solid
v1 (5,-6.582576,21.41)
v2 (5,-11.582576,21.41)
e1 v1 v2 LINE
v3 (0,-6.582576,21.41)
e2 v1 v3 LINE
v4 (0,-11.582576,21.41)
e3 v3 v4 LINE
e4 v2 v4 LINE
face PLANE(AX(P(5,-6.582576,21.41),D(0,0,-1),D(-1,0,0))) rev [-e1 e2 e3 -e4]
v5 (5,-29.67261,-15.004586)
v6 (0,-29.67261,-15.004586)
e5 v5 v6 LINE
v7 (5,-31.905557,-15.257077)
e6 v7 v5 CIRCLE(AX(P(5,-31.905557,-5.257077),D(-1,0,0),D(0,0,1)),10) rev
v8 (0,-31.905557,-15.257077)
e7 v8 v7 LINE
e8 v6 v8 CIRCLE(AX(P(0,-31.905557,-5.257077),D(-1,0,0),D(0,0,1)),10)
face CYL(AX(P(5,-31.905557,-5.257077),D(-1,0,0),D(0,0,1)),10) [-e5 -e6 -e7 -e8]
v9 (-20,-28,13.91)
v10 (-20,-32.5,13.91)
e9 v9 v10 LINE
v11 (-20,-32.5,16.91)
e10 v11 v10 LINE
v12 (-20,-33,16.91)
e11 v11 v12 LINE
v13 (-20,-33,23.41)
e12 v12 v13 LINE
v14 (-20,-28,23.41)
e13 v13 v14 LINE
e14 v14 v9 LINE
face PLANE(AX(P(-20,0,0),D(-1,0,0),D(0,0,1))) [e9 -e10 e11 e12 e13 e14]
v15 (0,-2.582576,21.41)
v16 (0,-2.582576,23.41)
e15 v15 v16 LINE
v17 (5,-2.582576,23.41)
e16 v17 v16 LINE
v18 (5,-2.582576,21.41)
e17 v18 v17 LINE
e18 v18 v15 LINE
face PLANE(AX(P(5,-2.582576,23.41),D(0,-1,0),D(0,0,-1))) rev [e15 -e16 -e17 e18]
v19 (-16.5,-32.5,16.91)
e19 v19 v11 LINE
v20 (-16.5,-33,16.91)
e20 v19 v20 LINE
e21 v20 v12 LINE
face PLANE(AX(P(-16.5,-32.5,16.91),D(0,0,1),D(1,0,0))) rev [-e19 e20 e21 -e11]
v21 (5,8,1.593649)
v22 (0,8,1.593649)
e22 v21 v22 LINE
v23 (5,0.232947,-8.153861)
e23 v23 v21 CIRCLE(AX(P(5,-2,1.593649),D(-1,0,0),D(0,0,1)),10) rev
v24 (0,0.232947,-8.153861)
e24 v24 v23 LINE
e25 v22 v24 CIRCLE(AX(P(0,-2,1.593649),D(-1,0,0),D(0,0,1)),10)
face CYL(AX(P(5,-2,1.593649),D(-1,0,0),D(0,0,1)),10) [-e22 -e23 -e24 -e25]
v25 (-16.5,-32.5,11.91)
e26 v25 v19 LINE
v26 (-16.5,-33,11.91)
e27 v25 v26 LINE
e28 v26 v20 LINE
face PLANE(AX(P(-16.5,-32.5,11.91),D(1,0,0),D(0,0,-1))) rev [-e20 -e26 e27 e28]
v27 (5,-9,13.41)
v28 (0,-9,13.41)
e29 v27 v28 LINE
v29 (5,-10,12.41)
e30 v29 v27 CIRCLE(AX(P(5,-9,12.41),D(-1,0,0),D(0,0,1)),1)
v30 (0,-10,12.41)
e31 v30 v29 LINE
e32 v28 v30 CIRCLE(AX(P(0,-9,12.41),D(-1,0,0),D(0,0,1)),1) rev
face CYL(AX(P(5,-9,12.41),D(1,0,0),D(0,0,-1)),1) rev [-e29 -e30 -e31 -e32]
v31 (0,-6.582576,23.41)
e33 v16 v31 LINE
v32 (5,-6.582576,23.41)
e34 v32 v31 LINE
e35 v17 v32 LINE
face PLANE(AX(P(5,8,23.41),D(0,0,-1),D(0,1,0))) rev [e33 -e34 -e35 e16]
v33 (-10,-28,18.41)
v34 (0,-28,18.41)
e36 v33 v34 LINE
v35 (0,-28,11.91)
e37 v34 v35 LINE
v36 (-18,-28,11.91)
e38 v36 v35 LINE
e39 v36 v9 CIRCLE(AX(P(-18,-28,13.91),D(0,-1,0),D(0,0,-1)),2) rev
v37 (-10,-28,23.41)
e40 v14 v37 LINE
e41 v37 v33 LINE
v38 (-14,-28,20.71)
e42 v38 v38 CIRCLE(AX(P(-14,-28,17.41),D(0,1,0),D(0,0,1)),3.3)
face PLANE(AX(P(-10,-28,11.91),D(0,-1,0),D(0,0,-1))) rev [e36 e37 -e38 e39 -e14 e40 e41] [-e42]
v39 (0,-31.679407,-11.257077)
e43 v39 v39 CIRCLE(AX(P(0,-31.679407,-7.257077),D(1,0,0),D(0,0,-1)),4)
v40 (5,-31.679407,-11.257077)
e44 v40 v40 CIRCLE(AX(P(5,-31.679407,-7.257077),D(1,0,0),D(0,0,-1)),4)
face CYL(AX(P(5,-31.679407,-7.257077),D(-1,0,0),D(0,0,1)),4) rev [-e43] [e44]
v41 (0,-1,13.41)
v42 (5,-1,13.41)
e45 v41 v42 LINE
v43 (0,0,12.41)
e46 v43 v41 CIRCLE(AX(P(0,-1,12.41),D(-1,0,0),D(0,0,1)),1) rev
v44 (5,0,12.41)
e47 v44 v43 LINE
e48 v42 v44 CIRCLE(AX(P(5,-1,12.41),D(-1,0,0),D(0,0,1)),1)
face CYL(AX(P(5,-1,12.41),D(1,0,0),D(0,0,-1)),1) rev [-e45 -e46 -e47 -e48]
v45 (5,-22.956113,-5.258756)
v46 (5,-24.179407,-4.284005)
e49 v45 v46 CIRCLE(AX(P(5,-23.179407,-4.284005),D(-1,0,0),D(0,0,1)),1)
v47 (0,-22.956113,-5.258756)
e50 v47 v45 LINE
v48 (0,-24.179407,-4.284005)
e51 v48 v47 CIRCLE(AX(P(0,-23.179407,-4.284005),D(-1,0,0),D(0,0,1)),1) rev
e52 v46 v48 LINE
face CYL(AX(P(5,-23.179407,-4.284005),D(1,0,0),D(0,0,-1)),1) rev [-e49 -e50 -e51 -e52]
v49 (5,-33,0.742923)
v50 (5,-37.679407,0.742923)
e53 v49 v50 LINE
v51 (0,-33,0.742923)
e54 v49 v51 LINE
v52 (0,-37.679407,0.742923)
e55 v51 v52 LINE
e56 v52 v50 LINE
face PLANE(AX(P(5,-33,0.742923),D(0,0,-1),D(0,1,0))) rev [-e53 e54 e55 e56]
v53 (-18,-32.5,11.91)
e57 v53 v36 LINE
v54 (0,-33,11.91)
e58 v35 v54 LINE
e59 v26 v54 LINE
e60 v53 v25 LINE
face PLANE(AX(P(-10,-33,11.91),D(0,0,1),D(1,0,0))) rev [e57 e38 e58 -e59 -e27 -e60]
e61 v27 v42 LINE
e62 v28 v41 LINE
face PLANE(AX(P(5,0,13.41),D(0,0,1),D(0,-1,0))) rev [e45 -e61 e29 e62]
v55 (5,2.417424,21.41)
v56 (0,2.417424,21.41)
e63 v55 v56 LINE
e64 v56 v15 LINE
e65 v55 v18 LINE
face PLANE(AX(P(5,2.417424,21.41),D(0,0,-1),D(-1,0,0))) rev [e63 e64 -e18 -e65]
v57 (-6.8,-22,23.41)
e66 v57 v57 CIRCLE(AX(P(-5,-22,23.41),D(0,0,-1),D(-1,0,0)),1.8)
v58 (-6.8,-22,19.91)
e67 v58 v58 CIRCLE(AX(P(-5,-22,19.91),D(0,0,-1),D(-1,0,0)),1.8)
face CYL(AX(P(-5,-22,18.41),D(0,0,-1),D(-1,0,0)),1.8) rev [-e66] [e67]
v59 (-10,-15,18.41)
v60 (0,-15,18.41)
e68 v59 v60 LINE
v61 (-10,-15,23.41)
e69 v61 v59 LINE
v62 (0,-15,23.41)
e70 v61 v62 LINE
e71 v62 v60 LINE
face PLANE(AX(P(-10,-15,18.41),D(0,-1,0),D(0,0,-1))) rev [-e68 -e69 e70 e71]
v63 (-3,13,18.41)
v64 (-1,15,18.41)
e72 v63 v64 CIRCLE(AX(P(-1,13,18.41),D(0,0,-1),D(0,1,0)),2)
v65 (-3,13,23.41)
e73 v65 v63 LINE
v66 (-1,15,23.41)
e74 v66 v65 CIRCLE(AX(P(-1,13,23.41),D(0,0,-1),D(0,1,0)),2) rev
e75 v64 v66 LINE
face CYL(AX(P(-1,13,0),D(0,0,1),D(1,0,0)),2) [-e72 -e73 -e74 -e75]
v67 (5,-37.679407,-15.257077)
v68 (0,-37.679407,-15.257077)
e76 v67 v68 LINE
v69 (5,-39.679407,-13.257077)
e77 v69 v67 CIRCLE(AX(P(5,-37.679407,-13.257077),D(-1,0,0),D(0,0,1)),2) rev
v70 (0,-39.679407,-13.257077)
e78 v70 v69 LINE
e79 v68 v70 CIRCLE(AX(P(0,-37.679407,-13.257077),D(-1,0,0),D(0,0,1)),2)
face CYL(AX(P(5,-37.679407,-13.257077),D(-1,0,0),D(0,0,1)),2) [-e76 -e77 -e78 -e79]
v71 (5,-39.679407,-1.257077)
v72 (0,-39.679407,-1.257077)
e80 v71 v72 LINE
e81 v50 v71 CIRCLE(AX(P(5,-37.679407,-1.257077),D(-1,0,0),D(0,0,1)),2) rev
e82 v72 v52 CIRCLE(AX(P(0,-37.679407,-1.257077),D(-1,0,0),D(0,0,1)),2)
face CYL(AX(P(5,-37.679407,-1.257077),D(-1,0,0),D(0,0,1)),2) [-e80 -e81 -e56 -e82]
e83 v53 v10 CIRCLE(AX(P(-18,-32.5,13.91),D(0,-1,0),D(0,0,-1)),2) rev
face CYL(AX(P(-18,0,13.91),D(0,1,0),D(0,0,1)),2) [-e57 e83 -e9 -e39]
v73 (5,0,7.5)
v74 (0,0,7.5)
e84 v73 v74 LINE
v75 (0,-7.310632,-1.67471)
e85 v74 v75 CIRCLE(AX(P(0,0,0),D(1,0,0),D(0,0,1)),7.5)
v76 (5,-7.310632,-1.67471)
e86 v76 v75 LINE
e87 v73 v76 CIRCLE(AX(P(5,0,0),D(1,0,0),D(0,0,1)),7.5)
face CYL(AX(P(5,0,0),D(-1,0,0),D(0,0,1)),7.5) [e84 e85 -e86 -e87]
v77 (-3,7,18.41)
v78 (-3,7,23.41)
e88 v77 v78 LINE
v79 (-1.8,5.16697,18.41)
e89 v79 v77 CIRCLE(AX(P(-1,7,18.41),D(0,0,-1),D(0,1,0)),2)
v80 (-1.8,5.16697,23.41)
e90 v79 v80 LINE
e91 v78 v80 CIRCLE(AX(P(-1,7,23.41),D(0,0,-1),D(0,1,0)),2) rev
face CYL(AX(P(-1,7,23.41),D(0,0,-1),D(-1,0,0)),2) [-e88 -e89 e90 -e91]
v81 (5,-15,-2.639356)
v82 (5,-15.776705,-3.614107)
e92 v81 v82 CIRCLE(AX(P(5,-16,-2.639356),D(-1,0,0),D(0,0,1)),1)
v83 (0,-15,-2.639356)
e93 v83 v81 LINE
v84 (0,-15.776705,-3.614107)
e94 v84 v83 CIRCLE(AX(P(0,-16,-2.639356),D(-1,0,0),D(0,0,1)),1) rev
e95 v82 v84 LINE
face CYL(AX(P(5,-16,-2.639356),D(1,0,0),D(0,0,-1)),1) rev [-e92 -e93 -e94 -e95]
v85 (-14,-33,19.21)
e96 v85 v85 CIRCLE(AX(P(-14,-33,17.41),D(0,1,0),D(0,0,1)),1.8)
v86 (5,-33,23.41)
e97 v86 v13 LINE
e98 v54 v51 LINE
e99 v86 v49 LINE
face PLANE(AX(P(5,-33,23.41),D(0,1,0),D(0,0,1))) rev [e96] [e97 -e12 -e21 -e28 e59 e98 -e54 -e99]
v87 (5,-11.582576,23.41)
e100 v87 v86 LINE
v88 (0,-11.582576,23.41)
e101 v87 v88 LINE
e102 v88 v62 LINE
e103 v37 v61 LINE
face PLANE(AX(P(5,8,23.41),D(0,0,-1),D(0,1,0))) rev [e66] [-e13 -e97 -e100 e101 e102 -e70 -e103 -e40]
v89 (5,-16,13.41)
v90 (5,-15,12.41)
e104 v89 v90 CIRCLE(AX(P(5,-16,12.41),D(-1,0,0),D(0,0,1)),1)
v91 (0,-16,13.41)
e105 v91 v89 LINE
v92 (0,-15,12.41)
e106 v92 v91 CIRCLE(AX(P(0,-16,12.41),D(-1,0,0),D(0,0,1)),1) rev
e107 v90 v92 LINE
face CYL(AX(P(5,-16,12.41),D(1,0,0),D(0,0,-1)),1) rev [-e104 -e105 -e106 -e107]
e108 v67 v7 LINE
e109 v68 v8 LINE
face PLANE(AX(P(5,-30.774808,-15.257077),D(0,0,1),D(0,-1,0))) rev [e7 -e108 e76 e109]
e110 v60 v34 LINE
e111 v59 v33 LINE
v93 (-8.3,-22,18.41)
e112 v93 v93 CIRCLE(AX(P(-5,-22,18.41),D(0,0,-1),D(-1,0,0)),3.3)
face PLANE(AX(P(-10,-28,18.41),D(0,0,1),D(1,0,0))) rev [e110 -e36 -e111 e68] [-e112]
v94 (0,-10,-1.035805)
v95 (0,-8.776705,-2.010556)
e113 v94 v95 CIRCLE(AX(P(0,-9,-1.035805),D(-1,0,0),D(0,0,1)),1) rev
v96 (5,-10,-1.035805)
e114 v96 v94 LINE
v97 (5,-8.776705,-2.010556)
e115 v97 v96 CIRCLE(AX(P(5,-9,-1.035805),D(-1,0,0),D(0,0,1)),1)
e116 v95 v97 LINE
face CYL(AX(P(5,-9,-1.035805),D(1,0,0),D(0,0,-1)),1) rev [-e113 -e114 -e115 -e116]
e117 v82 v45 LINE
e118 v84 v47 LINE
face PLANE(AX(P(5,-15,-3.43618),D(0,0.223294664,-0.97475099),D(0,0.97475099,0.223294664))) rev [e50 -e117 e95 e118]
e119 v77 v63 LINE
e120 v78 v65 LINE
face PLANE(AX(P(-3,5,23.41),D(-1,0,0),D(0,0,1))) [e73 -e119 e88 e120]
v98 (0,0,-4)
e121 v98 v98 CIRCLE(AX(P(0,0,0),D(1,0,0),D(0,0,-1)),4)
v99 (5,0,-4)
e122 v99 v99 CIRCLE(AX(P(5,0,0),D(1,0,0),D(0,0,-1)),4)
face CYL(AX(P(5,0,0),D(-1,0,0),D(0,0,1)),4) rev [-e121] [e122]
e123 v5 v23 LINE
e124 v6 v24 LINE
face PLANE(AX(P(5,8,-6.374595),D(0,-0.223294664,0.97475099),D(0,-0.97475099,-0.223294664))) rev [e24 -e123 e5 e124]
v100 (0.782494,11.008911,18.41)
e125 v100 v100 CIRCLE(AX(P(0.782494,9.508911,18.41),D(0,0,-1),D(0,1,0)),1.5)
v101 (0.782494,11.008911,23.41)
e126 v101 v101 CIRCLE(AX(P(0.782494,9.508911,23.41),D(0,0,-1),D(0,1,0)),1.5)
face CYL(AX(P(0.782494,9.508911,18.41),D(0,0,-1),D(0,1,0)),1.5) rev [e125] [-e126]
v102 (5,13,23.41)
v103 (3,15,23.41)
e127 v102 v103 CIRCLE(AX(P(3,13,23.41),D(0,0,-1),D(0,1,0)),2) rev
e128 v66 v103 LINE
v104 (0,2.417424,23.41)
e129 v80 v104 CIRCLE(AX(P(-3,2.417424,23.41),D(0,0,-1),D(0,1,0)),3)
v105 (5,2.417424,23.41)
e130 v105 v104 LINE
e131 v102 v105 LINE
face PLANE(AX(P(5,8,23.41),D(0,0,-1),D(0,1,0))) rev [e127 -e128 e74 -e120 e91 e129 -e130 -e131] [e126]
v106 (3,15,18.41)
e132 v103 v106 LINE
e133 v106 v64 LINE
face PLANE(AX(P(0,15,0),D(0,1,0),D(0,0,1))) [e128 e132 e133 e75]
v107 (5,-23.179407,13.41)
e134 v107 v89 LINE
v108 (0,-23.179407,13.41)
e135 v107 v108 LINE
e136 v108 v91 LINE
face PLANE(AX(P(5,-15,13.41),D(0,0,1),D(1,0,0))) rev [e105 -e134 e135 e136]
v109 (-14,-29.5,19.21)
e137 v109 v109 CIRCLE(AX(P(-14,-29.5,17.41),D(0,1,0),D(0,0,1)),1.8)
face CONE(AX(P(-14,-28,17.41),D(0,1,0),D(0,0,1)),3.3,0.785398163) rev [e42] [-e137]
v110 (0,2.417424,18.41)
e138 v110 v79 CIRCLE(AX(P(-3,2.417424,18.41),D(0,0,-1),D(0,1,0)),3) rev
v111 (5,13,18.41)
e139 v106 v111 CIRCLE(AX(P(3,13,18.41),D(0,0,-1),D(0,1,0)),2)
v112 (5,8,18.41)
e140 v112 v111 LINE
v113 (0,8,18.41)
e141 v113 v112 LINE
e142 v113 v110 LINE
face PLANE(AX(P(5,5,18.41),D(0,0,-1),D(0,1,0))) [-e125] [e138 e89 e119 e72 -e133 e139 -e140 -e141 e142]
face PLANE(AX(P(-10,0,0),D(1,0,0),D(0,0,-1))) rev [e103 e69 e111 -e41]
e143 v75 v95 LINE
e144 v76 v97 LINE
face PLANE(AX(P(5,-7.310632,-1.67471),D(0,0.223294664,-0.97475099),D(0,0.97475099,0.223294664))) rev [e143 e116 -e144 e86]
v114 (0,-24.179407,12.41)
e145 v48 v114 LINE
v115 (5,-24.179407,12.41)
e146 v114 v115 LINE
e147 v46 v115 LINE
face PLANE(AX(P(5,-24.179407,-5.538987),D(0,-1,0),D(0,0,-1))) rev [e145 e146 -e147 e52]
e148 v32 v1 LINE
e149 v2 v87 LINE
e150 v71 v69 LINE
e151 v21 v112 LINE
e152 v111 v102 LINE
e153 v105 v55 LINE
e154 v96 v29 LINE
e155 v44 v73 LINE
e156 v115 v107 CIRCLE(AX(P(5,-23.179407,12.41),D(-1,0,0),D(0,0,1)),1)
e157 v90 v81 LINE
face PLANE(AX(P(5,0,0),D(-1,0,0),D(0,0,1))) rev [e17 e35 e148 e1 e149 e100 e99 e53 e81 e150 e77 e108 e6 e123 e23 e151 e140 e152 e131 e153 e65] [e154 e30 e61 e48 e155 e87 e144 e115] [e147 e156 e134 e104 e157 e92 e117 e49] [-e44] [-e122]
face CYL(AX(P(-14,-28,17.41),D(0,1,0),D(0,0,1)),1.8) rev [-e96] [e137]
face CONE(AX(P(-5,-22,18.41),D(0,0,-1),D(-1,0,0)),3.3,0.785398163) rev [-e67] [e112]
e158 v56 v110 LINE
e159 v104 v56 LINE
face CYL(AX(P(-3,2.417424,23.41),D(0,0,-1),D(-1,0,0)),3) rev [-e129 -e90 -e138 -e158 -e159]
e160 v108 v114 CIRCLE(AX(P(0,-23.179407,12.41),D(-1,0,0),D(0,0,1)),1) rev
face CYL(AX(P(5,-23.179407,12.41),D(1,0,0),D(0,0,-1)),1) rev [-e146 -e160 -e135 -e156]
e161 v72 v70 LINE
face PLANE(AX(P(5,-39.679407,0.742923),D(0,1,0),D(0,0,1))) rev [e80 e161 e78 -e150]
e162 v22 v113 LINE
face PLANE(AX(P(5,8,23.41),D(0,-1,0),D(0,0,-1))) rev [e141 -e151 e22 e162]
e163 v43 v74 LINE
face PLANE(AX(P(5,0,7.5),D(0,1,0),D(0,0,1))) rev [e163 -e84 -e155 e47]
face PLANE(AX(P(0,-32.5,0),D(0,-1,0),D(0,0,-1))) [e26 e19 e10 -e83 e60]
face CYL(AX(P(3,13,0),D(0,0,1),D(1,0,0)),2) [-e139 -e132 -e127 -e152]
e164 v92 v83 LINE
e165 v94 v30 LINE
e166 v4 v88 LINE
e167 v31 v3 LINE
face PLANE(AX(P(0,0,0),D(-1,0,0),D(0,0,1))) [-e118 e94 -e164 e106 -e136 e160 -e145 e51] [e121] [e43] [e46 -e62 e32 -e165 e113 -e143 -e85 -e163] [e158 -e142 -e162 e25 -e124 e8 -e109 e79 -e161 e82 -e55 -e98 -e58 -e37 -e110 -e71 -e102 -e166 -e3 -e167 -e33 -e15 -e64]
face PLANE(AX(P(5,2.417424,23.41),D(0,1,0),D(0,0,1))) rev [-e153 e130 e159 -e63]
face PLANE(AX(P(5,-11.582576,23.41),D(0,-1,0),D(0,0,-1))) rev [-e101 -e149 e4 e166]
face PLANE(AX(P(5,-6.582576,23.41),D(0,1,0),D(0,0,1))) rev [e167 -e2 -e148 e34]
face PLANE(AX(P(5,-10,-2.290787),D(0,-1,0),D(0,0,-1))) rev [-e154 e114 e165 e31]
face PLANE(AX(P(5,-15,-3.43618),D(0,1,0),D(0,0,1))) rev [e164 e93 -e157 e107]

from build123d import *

# Parameters (mm, degrees)
SKETCH_1_R                = 4
EXTRUDE_1_DEPTH           = 5
EXTRUDE_2_DEPTH           = 10
FILLET_1_R                = 10
EXTRUDE_3_DEPTH           = 7
EXTRUDE_3_DEPTH_BACK      = 3
SKETCH_7_W                = 8
SKETCH_7_H                = 5
HOLE_WIZARD_1_D           = 3.6
HOLE_WIZARD_1_CSINK_D     = 6.6
HOLE_WIZARD_1_CSINK_ANGLE = 90
FILLET_2_R                = 2
FILLET_3_R                = 3
MM_TRANSITIONAL_1_D       = 3
SKETCH_10_W               = 2
SKETCH_10_H               = 5
CUT_EXTRUDE_1_DEPTH       = 48.143222787
SKETCH_11_W               = 11.5
SKETCH_11_H               = 5
EXTRUDE_4_DEPTH           = 10
HOLE_WIZARD_2_D           = 3.6
HOLE_WIZARD_2_CSINK_D     = 6.6
HOLE_WIZARD_2_CSINK_ANGLE = 90
CUT_EXTRUDE_2_DEPTH       = 51.224331302
FILLET_5_R                = 1
FILLET_6_R                = 2
SKETCH_13_W               = 3.5
SKETCH_13_H               = 5
CUT_EXTRUDE_3_DEPTH       = 0.5


with BuildPart() as part:
    # 草图1 → 凸台-拉伸1 (new body)
    with BuildSketch(Plane(origin=(0, 0, 0), x_dir=(0, 0, -1), z_dir=(1, 0, 0))):
        Polygon((-23.41, -33), (-0.742923434, -33), (-0.742923434, -39.679407187), (15.257076566, -39.679407187), (15.257076566, -30.774808421), (6.3745949, 8), (-23.41, 8), align=None)
        Circle(SKETCH_1_R, mode=Mode.SUBTRACT)
        with Locations((7.257076566, -31.679407187)):
            Circle(SKETCH_1_R, mode=Mode.SUBTRACT)
    extrude(amount=EXTRUDE_1_DEPTH)

    # 草图2 → 凸台-拉伸2 (add)
    with BuildSketch(Plane.ZY):
        Polygon((23.41, -15), (23.41, -33), (11.91, -33), (11.91, -28), (18.41, -28), (18.41, -15), align=None)
    extrude(amount=EXTRUDE_2_DEPTH)

    # 圆角1
    fillet_1_edges = [part.edges().sort_by_distance(p)[0] for p in [
        (2.5, 8, -6.3745949),
        (2.5, -30.774808421, -15.257076566),
    ]]
    fillet(fillet_1_edges, radius=FILLET_1_R)

    # 草图7 → 凸台-拉伸3 (add, two sides: drawn at the far end of the back side and taken through both)
    with BuildSketch(Plane(origin=(0, 8, 0), x_dir=(1, 0, 0), z_dir=(0, 1, 0)).offset(-EXTRUDE_3_DEPTH_BACK)):
        with Locations((1, -20.91)):
            Rectangle(SKETCH_7_W, SKETCH_7_H)
    extrude(amount=EXTRUDE_3_DEPTH + EXTRUDE_3_DEPTH_BACK)

    # 打孔尺寸(%根据十字)槽半沉头木螺钉的类型1 (through all)
    with Locations(Plane(origin=(0, 0, 18.41), x_dir=(-1, 0, 0), z_dir=(0, 0, -1))):
        with Locations((5, -22)):
            CounterSinkHole(HOLE_WIZARD_1_D / 2, HOLE_WIZARD_1_CSINK_D / 2, counter_sink_angle=HOLE_WIZARD_1_CSINK_ANGLE)

    # 圆角2
    fillet_2_edges = [part.edges().sort_by_distance(p)[0] for p in [
        (2.5, -39.679407187, 0.742923434),
        (2.5, -39.679407187, -15.257076566),
        (-3, 5, 20.91),
        (5, 15, 20.91),
        (-3, 15, 20.91),
    ]]
    fillet(fillet_2_edges, radius=FILLET_2_R)

    # 圆角3
    # the kernel refuses this fillet: 3 mm, written as the material it adds along each edge
    with BuildSketch(Plane(origin=(0, 5, 23.41), x_dir=(0, -1, 0), z_dir=(0, 0, -1))) as fillet_3_piece_1:
        with BuildLine():
            CenterArc((2.582575695, 3), FILLET_3_R, 203.578178478, 66.421821522)
            Line((-0.166969722, 1.8), (-0.441924264, 1.68))
            ThreePointArc((-0.441924264, 1.68), (-0.3, 1), (-0.3, 0))
            Line((-0.3, 0), (0, -0.3))
            Line((0, -0.3), (2.582575695, -0.3))
            Line((2.582575695, -0.3), (2.582575695, 0))
        make_face()
    extrude(amount=5)

    # 大小mm Transitional 暗销孔1 (through all)
    with Locations(Plane(origin=(0, 0, 18.41), x_dir=(-1, 0, 0), z_dir=(0, 0, -1))):
        with Locations((-0.78249385, 9.508910889)):
            Hole(MM_TRANSITIONAL_1_D / 2)

    # 草图10 → 切除-拉伸1 (cut, through all)
    with BuildSketch(Plane.ZY):
        with Locations((22.41, -0.082575695)):
            Rectangle(SKETCH_10_W, SKETCH_10_H)
        with Locations((22.41, -9.082575695)):
            Rectangle(SKETCH_10_W, SKETCH_10_H)
    extrude(amount=-CUT_EXTRUDE_1_DEPTH, mode=Mode.SUBTRACT)

    # 草图11 → 凸台-拉伸4 (add)
    with BuildSketch(Plane.ZY.offset(10)):
        with Locations((17.66, -30.5)):
            Rectangle(SKETCH_11_W, SKETCH_11_H)
    extrude(amount=EXTRUDE_4_DEPTH)

    # 打孔尺寸(%根据十字)槽半沉头木螺钉的类型2 (through all)
    with Locations(Plane(origin=(0, -28, 0), x_dir=(1, 0, 0), z_dir=(0, 1, 0))):
        with Locations((-14, -17.41)):
            CounterSinkHole(HOLE_WIZARD_2_D / 2, HOLE_WIZARD_2_CSINK_D / 2, counter_sink_angle=HOLE_WIZARD_2_CSINK_ANGLE)

    # 草图12 → 切除-拉伸2 (cut, through all)
    with BuildSketch(Plane.ZY):
        with BuildLine():
            Line((7.5, 0), (13.41, 0))
            Line((13.41, 0), (13.41, -10))
            Line((13.41, -10), (-2.290786732, -10))
            Line((-2.290786732, -10), (-1.674709977, -7.310632428))
            ThreePointArc((-1.674709977, -7.310632428), (4.673846124, -5.865591395), (7.5, 0))
        make_face()
        Polygon((-5.538986517, -24.179407187), (13.41, -24.179407187), (13.41, -15), (-3.436180098, -15), align=None)
    extrude(amount=-CUT_EXTRUDE_2_DEPTH, mode=Mode.SUBTRACT)

    # 圆角5
    fillet_5_edges = [part.edges().sort_by_distance(p)[0] for p in [
        (2.5, 0, 13.41),
        (2.5, -10, 13.41),
        (2.5, -10, -2.290786732),
        (2.5, -24.179407187, -5.538986517),
        (2.5, -15, -3.436180098),
        (2.5, -15, 13.41),
        (2.5, -24.179407187, 13.41),
    ]]
    fillet(fillet_5_edges, radius=FILLET_5_R)

    # 圆角6
    fillet_6_edges = [part.edges().sort_by_distance(p)[0] for p in [
        (-20, -30.5, 11.91),
    ]]
    fillet(fillet_6_edges, radius=FILLET_6_R)

    # 草图13 → 切除-拉伸3 (cut)
    with BuildSketch(Plane.XZ.offset(33)):
        with Locations((-18.25, 14.41)):
            Rectangle(SKETCH_13_W, SKETCH_13_H)
    extrude(amount=-CUT_EXTRUDE_3_DEPTH, mode=Mode.SUBTRACT)


solid = part.part
